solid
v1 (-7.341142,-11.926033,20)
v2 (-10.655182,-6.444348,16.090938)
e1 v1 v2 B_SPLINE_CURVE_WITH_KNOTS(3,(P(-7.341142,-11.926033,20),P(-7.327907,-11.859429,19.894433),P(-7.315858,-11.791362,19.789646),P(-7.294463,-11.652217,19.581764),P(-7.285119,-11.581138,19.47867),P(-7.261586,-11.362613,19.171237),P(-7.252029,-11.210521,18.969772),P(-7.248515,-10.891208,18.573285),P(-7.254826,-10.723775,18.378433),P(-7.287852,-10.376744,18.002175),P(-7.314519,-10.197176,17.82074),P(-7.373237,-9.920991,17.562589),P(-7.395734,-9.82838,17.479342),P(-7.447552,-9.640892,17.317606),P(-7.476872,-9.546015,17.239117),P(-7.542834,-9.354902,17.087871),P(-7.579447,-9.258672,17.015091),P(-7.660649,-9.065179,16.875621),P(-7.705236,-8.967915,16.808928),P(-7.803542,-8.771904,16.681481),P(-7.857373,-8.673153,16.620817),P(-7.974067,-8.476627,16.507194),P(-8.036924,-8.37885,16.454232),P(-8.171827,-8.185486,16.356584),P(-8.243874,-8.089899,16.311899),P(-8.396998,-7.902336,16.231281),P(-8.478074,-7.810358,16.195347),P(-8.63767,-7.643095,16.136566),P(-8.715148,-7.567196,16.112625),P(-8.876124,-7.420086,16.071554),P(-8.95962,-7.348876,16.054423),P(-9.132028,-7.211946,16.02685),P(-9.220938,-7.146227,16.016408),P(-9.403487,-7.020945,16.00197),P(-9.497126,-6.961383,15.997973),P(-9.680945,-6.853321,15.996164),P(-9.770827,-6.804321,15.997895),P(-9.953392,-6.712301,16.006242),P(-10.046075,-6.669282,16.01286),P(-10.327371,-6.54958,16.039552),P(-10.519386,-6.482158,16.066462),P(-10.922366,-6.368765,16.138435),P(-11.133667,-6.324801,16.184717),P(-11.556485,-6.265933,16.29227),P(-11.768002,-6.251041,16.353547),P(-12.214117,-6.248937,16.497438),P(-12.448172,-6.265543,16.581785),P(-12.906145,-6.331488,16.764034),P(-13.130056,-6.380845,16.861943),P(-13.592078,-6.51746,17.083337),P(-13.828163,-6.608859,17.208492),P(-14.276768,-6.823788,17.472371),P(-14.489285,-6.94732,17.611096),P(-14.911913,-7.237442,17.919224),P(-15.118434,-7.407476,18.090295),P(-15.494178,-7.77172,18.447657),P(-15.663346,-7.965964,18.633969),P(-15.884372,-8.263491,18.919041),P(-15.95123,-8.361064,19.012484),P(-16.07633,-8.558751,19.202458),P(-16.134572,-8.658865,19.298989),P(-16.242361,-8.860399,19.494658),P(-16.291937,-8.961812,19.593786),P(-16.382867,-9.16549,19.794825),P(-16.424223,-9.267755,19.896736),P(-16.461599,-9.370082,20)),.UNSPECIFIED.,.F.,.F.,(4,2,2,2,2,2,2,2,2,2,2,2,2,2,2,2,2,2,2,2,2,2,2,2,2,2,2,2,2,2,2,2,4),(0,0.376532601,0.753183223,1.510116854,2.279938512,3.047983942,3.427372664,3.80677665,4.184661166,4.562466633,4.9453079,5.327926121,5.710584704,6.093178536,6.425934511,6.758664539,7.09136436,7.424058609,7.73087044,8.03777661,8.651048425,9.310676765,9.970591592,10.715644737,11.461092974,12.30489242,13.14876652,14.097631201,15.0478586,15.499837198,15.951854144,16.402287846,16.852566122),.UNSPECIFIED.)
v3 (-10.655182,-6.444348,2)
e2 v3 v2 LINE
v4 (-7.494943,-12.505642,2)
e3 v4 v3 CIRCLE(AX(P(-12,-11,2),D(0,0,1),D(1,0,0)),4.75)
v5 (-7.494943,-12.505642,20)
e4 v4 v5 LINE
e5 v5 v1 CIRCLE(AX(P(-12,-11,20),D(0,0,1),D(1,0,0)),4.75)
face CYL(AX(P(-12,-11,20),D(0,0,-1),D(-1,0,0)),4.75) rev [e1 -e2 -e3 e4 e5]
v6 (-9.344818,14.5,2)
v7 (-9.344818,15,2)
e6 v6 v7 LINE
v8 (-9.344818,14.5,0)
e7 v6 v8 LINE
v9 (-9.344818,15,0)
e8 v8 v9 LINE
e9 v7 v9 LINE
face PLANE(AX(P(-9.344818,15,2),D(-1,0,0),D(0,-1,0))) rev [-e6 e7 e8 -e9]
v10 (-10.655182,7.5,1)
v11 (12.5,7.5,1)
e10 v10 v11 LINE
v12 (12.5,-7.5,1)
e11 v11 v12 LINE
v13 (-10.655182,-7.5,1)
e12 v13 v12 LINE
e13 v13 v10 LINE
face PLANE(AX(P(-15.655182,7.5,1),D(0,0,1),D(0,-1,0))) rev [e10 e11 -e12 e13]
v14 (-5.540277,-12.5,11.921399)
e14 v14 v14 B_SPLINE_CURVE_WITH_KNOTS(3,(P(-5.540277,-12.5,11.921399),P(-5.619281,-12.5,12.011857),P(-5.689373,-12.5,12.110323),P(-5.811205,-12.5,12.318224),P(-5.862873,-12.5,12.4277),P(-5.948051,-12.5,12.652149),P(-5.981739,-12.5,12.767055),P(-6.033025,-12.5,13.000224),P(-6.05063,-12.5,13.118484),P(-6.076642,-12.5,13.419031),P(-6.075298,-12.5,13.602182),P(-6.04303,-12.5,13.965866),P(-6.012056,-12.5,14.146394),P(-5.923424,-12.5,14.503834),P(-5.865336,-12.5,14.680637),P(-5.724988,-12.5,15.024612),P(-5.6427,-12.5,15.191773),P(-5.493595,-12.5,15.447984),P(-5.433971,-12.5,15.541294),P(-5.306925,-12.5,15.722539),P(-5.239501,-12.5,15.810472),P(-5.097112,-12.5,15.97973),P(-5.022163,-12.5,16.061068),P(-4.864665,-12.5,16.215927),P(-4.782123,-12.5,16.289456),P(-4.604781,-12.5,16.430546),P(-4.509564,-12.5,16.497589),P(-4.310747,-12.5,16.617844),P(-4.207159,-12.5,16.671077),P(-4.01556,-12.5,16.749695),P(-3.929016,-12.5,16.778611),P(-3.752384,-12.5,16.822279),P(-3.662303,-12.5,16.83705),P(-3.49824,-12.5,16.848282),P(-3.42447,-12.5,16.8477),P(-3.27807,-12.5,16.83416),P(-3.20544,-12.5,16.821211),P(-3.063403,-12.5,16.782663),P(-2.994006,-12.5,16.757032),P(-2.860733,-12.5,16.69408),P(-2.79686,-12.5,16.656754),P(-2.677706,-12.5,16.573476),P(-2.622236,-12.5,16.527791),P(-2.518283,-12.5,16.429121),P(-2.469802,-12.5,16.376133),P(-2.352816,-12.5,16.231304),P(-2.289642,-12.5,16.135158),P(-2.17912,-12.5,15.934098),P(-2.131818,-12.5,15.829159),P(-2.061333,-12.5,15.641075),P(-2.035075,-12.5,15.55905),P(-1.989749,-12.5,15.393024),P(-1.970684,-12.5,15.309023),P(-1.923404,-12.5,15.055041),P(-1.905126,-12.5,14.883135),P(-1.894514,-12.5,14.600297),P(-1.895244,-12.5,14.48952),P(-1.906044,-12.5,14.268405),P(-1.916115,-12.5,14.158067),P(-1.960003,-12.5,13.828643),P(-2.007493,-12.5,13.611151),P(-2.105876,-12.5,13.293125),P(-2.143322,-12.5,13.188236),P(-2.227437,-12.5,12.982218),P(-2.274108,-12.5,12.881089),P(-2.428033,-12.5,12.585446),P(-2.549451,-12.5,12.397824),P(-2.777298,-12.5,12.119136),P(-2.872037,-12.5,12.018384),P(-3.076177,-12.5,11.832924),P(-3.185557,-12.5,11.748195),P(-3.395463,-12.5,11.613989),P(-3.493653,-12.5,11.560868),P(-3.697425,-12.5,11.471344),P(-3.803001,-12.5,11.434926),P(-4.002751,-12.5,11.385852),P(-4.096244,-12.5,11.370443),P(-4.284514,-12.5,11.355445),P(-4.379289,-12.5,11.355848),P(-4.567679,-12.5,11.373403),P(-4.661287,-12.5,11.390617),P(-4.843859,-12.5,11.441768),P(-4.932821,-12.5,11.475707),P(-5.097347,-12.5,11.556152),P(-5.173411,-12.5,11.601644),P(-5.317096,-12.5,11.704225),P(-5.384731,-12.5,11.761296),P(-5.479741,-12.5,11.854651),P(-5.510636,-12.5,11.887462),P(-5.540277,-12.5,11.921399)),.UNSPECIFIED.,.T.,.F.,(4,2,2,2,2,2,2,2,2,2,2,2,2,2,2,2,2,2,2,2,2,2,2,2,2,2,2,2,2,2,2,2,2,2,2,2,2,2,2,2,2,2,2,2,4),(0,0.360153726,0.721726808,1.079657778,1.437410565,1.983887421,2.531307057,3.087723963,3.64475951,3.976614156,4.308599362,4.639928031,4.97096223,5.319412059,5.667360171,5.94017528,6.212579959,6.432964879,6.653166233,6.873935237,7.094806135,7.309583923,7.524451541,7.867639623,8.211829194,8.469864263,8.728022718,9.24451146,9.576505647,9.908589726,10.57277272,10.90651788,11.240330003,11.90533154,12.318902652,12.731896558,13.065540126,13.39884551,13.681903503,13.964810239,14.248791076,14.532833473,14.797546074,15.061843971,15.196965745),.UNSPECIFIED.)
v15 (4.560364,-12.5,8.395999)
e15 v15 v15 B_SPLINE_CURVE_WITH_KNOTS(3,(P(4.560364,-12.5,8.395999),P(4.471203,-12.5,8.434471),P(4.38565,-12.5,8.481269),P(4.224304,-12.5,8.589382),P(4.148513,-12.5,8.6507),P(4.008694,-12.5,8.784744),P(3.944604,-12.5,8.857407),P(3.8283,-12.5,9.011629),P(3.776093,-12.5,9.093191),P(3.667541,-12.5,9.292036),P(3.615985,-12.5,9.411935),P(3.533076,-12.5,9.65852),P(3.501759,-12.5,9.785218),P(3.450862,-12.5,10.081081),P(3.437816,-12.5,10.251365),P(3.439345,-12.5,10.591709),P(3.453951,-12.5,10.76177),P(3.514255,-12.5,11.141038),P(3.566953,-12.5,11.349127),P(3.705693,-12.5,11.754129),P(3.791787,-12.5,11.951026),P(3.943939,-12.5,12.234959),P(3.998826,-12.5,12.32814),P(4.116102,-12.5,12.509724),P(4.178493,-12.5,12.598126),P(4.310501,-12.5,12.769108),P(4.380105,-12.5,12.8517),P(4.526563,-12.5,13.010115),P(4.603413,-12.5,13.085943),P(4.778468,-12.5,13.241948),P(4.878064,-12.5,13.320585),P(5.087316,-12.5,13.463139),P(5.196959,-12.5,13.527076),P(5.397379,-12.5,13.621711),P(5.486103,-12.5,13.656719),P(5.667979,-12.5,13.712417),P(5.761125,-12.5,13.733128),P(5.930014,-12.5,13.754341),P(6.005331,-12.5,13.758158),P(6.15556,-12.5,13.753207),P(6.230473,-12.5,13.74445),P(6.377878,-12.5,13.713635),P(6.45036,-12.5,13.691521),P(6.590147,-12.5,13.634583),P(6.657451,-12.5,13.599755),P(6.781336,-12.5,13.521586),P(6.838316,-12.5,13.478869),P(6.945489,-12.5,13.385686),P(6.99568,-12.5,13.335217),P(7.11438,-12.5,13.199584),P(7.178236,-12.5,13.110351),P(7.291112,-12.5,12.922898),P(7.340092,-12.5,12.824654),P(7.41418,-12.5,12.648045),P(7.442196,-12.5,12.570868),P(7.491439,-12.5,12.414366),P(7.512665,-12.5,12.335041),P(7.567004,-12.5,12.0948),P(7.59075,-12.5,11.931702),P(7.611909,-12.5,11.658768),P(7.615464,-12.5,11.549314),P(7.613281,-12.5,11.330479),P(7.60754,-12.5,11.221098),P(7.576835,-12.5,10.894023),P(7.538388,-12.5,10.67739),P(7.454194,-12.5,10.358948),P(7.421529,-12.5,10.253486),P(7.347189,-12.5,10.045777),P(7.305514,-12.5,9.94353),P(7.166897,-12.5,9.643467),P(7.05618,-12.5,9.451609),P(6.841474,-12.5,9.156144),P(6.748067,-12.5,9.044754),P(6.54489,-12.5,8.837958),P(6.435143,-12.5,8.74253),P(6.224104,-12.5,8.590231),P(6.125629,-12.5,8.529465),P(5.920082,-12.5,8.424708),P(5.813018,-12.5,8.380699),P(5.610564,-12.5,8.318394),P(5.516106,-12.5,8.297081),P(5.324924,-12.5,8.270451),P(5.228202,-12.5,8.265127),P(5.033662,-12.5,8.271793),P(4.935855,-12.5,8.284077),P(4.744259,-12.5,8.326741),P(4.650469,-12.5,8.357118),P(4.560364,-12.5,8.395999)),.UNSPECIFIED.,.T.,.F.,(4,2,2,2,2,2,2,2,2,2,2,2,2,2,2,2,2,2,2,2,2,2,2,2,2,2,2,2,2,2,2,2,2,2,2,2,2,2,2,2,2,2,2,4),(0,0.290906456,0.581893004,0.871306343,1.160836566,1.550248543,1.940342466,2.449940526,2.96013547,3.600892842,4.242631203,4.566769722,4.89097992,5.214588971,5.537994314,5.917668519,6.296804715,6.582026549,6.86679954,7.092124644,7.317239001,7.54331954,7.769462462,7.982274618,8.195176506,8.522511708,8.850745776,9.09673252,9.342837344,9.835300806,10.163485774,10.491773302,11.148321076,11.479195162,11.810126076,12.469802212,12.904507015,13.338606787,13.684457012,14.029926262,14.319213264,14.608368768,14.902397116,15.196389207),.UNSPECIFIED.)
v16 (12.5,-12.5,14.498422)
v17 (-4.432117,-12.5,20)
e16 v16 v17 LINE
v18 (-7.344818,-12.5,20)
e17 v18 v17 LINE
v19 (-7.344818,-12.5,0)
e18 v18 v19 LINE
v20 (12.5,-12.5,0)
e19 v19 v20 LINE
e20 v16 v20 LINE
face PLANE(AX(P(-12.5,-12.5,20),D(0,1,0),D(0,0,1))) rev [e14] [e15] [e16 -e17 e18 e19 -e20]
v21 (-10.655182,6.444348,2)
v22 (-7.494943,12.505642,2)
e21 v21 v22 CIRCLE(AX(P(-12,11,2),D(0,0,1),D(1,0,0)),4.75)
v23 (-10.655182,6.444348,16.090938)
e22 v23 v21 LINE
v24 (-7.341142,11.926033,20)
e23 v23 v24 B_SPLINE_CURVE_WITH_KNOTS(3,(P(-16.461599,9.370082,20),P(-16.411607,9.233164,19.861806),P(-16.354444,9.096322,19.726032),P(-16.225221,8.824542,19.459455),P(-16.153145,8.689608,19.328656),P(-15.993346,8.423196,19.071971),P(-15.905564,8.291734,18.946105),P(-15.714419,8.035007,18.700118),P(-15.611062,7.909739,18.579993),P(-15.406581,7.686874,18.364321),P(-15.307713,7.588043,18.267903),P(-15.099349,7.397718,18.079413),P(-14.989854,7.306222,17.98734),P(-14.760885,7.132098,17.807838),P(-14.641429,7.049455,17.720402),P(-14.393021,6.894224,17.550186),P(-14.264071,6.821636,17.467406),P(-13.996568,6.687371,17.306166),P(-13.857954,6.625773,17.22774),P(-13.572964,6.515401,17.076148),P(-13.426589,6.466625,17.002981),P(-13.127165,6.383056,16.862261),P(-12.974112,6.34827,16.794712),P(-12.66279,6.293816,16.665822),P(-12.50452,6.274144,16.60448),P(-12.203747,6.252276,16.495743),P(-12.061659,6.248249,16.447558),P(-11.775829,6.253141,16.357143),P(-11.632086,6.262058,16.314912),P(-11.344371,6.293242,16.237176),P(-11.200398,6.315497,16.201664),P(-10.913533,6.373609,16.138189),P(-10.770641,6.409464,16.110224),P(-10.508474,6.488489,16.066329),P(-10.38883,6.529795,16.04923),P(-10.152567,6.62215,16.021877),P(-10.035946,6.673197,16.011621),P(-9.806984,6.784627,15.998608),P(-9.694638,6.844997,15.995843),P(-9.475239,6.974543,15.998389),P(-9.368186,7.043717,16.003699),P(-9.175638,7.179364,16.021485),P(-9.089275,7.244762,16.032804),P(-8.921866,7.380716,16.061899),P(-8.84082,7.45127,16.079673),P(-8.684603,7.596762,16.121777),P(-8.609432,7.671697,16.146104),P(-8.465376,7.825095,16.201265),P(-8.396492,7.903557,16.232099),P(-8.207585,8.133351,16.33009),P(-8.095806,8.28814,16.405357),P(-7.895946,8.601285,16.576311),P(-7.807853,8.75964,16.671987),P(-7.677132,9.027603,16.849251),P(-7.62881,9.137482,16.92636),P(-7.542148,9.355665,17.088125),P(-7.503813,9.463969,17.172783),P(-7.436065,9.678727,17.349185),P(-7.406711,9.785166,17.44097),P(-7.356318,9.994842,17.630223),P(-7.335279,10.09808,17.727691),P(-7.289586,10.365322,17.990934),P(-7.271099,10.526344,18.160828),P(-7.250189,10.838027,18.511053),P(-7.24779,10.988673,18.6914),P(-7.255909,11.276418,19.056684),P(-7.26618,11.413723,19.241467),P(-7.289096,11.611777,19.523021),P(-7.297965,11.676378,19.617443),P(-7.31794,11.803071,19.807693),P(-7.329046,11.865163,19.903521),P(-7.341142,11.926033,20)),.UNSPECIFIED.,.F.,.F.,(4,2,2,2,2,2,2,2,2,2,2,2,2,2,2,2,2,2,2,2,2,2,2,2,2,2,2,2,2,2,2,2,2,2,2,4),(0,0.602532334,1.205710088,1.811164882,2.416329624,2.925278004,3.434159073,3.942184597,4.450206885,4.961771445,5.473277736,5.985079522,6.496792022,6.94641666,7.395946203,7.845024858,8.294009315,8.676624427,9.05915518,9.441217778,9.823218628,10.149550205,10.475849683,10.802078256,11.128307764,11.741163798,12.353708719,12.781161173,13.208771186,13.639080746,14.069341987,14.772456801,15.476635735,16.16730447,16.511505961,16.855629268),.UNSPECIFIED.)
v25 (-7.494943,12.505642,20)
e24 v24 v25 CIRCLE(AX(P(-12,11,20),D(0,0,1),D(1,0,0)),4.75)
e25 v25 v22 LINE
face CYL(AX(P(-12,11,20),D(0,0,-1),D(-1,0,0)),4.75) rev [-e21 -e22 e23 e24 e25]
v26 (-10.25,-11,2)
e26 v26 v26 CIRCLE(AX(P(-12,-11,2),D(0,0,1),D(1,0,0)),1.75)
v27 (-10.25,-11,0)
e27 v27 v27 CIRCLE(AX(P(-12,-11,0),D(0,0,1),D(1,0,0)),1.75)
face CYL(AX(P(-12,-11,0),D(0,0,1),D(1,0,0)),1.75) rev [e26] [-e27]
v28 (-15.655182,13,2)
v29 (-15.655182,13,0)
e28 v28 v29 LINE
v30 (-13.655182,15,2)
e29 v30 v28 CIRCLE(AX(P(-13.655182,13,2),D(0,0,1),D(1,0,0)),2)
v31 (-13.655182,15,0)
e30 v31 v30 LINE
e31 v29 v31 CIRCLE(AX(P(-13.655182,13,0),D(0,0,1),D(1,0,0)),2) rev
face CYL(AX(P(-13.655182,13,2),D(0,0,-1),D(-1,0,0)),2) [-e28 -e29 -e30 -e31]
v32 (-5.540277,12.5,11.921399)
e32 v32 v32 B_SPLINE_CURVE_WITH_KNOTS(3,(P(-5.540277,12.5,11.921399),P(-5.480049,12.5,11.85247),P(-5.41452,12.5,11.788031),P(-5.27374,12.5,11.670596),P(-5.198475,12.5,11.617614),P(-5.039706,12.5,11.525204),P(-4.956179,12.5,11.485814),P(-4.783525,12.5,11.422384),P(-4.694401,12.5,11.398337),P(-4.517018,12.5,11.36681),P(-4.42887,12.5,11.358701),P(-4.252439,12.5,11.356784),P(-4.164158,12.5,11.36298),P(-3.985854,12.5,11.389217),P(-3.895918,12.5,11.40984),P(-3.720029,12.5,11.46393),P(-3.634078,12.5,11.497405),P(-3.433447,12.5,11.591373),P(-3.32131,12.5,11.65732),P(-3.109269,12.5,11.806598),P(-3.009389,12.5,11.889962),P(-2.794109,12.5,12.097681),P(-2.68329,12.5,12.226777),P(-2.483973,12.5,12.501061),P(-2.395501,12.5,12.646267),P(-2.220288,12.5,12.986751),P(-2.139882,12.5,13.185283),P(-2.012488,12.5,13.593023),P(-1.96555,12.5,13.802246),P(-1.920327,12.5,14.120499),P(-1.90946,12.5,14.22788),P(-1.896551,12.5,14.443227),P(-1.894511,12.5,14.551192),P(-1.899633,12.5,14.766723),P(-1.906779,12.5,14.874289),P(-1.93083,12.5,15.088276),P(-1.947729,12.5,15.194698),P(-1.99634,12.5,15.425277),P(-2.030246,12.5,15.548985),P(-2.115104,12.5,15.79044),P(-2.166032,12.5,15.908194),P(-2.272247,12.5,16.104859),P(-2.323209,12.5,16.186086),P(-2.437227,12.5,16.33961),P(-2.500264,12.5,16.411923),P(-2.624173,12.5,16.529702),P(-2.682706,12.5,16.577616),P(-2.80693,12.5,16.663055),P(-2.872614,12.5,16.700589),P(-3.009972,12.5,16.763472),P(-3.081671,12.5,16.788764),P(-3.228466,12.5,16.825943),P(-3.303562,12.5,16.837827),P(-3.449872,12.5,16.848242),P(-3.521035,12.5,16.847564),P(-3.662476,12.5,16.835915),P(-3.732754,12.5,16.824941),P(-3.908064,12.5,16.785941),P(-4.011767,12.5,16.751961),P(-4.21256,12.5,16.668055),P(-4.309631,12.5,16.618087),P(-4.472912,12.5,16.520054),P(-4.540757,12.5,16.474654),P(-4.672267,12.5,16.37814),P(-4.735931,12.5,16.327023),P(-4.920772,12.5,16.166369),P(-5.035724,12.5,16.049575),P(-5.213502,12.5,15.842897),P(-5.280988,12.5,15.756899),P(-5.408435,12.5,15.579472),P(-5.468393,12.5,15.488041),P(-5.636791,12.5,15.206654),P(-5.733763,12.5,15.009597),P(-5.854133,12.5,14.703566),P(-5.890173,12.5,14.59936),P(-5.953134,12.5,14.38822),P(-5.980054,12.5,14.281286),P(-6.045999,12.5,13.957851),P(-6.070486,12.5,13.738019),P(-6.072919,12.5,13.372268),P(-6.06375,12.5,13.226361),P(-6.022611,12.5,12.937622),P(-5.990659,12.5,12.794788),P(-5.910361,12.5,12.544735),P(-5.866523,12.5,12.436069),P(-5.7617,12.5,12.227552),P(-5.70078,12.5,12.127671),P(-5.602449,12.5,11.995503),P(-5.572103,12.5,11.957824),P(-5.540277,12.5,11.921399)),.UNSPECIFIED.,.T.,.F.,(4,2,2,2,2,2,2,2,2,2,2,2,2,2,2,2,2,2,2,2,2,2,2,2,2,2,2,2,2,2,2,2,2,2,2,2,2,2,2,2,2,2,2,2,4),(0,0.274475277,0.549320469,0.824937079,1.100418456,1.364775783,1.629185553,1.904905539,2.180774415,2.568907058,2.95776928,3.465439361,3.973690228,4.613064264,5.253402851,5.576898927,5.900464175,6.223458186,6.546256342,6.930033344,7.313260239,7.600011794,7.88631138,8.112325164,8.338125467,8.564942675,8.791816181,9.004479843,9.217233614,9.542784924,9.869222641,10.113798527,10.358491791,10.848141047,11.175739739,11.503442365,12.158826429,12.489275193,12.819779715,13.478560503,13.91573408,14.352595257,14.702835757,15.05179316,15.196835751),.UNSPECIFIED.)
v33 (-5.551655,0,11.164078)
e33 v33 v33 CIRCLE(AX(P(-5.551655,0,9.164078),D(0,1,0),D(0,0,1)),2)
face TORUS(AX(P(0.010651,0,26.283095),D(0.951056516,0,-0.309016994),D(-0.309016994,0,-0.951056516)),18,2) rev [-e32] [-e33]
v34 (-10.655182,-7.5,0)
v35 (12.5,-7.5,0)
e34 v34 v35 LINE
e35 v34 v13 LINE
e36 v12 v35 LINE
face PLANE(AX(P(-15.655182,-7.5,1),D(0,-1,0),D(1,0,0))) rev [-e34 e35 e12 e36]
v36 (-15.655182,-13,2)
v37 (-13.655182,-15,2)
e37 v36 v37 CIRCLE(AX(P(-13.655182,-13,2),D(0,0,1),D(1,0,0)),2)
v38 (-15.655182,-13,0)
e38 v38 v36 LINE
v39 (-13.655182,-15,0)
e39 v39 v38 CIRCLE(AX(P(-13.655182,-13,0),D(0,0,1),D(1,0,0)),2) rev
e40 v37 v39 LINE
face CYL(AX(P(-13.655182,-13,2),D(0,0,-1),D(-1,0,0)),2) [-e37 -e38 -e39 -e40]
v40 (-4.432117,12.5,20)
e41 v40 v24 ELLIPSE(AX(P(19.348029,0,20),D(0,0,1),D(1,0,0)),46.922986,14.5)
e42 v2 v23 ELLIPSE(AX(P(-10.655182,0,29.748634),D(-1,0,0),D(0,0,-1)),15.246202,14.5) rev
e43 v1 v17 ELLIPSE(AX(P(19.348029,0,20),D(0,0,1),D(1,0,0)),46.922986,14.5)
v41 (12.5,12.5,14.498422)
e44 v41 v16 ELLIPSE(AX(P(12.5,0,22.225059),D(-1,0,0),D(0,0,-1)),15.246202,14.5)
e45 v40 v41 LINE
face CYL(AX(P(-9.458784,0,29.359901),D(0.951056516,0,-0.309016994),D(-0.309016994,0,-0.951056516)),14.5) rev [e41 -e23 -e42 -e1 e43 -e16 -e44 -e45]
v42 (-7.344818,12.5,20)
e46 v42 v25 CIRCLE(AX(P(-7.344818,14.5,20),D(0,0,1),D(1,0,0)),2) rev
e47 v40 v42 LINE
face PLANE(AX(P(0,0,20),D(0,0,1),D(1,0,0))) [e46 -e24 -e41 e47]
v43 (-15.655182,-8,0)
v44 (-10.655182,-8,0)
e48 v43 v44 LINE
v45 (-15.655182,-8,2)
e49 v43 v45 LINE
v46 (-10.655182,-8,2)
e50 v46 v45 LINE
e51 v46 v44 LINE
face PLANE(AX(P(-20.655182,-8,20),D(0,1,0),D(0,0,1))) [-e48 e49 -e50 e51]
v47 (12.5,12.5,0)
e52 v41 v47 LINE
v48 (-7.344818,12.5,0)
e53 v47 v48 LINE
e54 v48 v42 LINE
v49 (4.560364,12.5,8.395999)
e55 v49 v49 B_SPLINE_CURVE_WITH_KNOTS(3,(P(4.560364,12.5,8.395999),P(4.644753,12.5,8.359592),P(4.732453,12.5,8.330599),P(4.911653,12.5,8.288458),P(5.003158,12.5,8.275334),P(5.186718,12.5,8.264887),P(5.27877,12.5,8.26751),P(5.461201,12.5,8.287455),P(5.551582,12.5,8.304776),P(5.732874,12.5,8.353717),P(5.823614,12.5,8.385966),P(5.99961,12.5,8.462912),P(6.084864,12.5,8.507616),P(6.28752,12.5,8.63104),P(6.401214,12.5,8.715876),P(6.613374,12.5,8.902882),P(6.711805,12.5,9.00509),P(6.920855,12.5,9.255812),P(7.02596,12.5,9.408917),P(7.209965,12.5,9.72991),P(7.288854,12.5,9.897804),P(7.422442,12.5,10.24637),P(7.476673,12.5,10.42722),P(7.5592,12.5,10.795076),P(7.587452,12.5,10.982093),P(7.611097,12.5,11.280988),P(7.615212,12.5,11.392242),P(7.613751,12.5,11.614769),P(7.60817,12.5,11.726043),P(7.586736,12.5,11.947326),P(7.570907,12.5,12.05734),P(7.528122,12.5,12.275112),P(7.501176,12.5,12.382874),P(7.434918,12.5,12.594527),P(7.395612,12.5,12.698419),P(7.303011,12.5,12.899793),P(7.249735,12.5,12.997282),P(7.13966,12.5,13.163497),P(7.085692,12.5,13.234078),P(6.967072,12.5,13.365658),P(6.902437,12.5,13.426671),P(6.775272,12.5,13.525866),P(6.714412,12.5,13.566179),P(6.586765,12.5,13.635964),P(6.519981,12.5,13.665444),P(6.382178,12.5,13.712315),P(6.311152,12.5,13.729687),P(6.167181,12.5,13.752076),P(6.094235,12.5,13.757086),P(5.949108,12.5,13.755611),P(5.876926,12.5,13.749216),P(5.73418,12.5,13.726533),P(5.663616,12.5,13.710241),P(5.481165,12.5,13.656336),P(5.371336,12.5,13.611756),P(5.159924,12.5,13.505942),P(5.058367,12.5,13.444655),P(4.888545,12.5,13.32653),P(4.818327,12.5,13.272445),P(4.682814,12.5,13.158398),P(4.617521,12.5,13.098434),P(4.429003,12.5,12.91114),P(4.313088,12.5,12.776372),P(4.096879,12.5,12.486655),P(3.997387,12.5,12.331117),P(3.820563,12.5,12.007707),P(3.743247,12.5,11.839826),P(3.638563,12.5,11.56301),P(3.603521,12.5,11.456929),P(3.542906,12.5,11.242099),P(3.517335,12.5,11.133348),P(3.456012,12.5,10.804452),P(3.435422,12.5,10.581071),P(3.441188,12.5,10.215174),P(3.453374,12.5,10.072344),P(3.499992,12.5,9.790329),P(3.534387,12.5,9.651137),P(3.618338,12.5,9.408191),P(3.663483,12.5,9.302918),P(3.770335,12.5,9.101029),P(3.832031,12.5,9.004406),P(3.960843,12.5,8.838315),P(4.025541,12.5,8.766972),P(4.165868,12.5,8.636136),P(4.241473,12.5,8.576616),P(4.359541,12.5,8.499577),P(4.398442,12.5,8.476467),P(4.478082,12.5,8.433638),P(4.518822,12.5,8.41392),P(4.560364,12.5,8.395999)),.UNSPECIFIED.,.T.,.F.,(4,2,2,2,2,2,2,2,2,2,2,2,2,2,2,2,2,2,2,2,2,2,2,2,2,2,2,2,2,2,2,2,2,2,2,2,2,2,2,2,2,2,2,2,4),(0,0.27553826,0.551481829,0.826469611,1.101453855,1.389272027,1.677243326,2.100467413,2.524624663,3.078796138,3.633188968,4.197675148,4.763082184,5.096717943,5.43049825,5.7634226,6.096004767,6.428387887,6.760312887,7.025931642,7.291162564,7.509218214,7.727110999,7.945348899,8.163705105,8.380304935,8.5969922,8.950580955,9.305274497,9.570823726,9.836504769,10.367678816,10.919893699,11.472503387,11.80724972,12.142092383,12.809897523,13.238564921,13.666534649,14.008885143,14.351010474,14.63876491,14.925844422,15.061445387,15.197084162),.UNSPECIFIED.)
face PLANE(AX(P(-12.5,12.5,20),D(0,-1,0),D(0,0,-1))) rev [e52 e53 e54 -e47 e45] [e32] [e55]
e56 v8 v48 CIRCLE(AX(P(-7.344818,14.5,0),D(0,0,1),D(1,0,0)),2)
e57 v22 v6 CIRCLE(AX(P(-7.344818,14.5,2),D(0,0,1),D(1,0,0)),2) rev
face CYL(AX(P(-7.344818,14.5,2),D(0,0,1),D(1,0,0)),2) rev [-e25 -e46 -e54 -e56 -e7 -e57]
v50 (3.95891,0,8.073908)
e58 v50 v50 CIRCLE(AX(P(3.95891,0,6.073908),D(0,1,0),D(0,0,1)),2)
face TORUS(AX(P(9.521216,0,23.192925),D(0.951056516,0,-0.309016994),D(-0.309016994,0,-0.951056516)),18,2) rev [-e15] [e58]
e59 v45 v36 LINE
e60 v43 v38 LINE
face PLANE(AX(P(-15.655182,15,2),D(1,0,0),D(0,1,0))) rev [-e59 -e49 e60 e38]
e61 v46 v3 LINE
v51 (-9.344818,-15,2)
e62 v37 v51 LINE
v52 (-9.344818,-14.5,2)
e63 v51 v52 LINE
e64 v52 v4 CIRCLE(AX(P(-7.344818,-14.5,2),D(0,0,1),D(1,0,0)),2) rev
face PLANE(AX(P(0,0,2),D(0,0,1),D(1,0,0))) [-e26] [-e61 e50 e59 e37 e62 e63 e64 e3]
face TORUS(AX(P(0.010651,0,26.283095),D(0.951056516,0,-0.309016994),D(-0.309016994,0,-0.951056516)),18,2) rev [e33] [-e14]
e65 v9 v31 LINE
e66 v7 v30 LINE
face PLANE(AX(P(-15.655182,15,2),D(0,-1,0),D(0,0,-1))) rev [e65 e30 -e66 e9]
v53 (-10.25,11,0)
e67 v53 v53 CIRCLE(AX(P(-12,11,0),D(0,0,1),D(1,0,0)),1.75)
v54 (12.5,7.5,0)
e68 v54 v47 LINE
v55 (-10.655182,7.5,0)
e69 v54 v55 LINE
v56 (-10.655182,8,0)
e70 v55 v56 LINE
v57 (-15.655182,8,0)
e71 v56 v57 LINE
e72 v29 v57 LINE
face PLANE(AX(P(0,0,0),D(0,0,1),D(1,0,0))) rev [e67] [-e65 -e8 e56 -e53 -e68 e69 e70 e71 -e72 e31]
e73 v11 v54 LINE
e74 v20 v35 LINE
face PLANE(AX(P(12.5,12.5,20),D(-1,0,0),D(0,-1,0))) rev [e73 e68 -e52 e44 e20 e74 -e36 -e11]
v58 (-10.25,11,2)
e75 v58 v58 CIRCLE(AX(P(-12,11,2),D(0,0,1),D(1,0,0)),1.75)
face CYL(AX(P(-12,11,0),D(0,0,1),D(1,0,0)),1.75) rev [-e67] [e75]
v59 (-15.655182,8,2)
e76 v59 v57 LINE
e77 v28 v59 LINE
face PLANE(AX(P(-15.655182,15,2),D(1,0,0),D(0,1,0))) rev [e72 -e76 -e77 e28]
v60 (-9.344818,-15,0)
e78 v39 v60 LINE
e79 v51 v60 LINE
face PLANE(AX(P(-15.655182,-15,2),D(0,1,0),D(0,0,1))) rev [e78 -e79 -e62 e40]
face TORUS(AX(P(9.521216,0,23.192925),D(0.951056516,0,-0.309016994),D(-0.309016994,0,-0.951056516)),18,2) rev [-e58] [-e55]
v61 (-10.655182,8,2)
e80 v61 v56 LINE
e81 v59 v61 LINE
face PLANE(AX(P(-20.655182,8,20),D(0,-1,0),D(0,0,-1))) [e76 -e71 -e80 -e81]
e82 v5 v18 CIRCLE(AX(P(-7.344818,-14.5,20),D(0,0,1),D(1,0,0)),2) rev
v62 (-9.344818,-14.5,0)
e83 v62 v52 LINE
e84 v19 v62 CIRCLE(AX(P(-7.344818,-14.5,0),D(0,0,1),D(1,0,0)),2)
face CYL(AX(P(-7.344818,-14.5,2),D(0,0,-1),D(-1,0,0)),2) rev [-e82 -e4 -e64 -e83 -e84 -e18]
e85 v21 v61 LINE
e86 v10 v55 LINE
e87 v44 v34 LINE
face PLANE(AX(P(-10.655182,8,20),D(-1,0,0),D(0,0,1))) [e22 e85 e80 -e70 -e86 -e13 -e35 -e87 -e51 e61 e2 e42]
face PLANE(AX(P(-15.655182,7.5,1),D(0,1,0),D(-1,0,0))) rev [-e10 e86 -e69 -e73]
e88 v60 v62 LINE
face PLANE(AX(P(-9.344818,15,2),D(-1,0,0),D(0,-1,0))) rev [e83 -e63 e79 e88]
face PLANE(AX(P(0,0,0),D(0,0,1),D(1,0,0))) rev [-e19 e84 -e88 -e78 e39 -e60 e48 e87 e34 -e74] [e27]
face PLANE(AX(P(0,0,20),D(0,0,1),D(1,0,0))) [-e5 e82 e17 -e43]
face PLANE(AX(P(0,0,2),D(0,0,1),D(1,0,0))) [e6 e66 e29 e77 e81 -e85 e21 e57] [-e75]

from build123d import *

# Parameters (mm, degrees)
SKETCH1_W               = 25
SKETCH1_H               = 25
BOSS_EXTRUDE1_DEPTH     = 20
SKETCH2_R               = 14.5
CUT_EXTRUDE1_DEPTH      = 36.825056471
SKETCH3_W               = 6.310364348
SKETCH3_H               = 30
BOSS_EXTRUDE2_DEPTH     = 2
SKETCH4_W               = 10
SKETCH4_H               = 16
CUT_EXTRUDE2_DEPTH      = 30.497198662
CUT_EXTRUDE3_DEPTH      = 29.179509025
CUT_EXTRUDE3_DEPTH_BACK = 29.179509025
SKETCH5_R               = 1.75
SKETCH7_R               = 4.75
CUT_EXTRUDE4_DEPTH      = 29.179509089
CUT_SWEEP1_PROFILE_R    = 2
LPATTERN1_COUNT         = 2
LPATTERN1_PITCH         = 10
FILLET1_START           = -1
FILLET1_DEPTH           = 21
FILLET1_2_DEPTH         = 2
FILLET1_START_2         = 1.80548
FILLET1_3_DEPTH         = 18.19452
SKETCH11_W              = 2
SKETCH11_H              = 15
CUT_EXTRUDE5_DEPTH      = 38.652546889


with BuildPart() as part:
    # Sketch1 → Boss-Extrude1 (new body)
    with BuildSketch(Plane.XY):
        Rectangle(SKETCH1_W, SKETCH1_H)
    extrude(amount=BOSS_EXTRUDE1_DEPTH)

    # Sketch2 → Cut-Extrude1 (cut, through all)
    with BuildSketch(Plane(origin=(11.306356215, 0, -3.673657827), x_dir=(0, 1, 0), z_dir=(0.9510565162951534, 0, -0.3090169943749482))):
        with Locations((0, 25)):
            Circle(SKETCH2_R)
    extrude(amount=-CUT_EXTRUDE1_DEPTH, mode=Mode.SUBTRACT)

    # Sketch3 → Boss-Extrude2 (add)
    with BuildSketch(Plane.XY):
        with Locations((-12.5, 0)):
            Rectangle(SKETCH3_W, SKETCH3_H)
    extrude(amount=BOSS_EXTRUDE2_DEPTH)

    # Sketch4 → Cut-Extrude2 (cut, through all)
    with BuildSketch(Plane.XY):
        with Locations((-15.655182174, 0)):
            Rectangle(SKETCH4_W, SKETCH4_H)
    extrude(amount=CUT_EXTRUDE2_DEPTH, mode=Mode.SUBTRACT)

    # Sketch5 → Cut-Extrude3 (cut, two sides: drawn at the far end of the back side and taken through both)
    with BuildSketch(Plane.XY.offset(2).offset(-CUT_EXTRUDE3_DEPTH_BACK)):
        with Locations((-12, 11)):
            Circle(SKETCH5_R)
        with Locations((-12, -11)):
            Circle(SKETCH5_R)
    extrude(amount=CUT_EXTRUDE3_DEPTH + CUT_EXTRUDE3_DEPTH_BACK, mode=Mode.SUBTRACT)

    # Sketch7 → Cut-Extrude4 (cut, through all)
    with BuildSketch(Plane.XY.offset(2)):
        with Locations((-12, 11)):
            Circle(SKETCH7_R)
        with Locations((-12, -11)):
            Circle(SKETCH7_R)
    extrude(amount=CUT_EXTRUDE4_DEPTH, mode=Mode.SUBTRACT)

    # Cut-Sweep1: sweep along a path in Sketch8
    with BuildLine(Plane(origin=(1.795791052, 0, -0.583487883), x_dir=(0, 1, 0), z_dir=(0.9510565162951534, 0, -0.3090169943749482))) as cut_sweep1_path:
        CenterArc((0, 25), 18, 0, 360)
    # Cut-Sweep1 profile (on start of the path) → Cut-Sweep1 (sweep, cut)
    with BuildSketch(Plane(origin=(9.521215911, 18, 23.192925024), x_dir=(0.9510565162951534, 0, -0.3090169943749482), z_dir=(0.3090169943749482, 0, 0.9510565162951534))):
        Circle(CUT_SWEEP1_PROFILE_R)
    cut_sweep1 = sweep(path=cut_sweep1_path.line, mode=Mode.SUBTRACT)

    # LPattern1: Cut-Sweep1 ×2
    with Locations(*[Vector(-0.9510565162951534, 0, 0.3090169943749481) * (i * LPATTERN1_PITCH) for i in range(1, LPATTERN1_COUNT)]):
        add(cut_sweep1, mode=Mode.SUBTRACT)

    # Fillet1: read off the stored shape, not the designer's step
    # Fillet1 outline → Fillet1 (cut)
    with BuildSketch(Plane.XY.offset(FILLET1_START)):
        with BuildLine():
            ThreePointArc((-15.655182174, 13), (-15.069395736, 14.414213562), (-13.655182174, 15))
            Line((-13.655182174, 15), (-15.655182174, 15))
            Line((-15.655182174, 15), (-15.655182174, 13))
        make_face()
        with BuildLine():
            Line((-15.655182174, -15), (-13.655182174, -15))
            ThreePointArc((-13.655182174, -15), (-15.069395736, -14.414213562), (-15.655182174, -13))
            Line((-15.655182174, -13), (-15.655182174, -15))
        make_face()
    extrude(amount=FILLET1_DEPTH, mode=Mode.SUBTRACT)

    # Fillet1 2 outline → Fillet1 2 (add)
    with BuildSketch(Plane.XY):
        with BuildLine():
            Line((-9.344817826, 14.5), (-9.344817826, 12.5))
            Line((-9.344817826, 12.5), (-7.344817826, 12.5))
            ThreePointArc((-7.344817826, 12.5), (-8.759031388, 13.085786438), (-9.344817826, 14.5))
        make_face()
        with BuildLine():
            Line((-9.344817826, -12.5), (-9.344817826, -14.5))
            ThreePointArc((-9.344817826, -14.5), (-8.759031388, -13.085786438), (-7.344817826, -12.5))
            Line((-7.344817826, -12.5), (-9.344817826, -12.5))
        make_face()
    extrude(amount=FILLET1_2_DEPTH)

    # Fillet1 3 outline → Fillet1 3 (add)
    with BuildSketch(Plane.XY.offset(FILLET1_START_2)):
        with BuildLine():
            ThreePointArc((-7.344817826, 12.5), (-7.419933265, 12.50141108), (-7.494942711, 12.505642329))
            ThreePointArc((-7.494942711, 12.505642329), (-7.494000925, 12.502821459), (-7.493060906, 12.5))
            Line((-7.493060906, 12.5), (-7.344817826, 12.5))
        make_face()
        with BuildLine():
            ThreePointArc((-7.493060906, -12.5), (-7.494000925, -12.502821459), (-7.494942711, -12.505642329))
            ThreePointArc((-7.494942711, -12.505642329), (-7.419933265, -12.50141108), (-7.344817826, -12.5))
            Line((-7.344817826, -12.5), (-7.493060906, -12.5))
        make_face()
    extrude(amount=FILLET1_3_DEPTH)

    # Sketch11 → Cut-Extrude5 (cut, through all)
    with BuildSketch(Plane(origin=(12.5, 0, 0), x_dir=(0, 0, -1), z_dir=(1, 0, 0))):
        Rectangle(SKETCH11_W, SKETCH11_H)
    extrude(amount=-CUT_EXTRUDE5_DEPTH, mode=Mode.SUBTRACT)


solid = part.part
